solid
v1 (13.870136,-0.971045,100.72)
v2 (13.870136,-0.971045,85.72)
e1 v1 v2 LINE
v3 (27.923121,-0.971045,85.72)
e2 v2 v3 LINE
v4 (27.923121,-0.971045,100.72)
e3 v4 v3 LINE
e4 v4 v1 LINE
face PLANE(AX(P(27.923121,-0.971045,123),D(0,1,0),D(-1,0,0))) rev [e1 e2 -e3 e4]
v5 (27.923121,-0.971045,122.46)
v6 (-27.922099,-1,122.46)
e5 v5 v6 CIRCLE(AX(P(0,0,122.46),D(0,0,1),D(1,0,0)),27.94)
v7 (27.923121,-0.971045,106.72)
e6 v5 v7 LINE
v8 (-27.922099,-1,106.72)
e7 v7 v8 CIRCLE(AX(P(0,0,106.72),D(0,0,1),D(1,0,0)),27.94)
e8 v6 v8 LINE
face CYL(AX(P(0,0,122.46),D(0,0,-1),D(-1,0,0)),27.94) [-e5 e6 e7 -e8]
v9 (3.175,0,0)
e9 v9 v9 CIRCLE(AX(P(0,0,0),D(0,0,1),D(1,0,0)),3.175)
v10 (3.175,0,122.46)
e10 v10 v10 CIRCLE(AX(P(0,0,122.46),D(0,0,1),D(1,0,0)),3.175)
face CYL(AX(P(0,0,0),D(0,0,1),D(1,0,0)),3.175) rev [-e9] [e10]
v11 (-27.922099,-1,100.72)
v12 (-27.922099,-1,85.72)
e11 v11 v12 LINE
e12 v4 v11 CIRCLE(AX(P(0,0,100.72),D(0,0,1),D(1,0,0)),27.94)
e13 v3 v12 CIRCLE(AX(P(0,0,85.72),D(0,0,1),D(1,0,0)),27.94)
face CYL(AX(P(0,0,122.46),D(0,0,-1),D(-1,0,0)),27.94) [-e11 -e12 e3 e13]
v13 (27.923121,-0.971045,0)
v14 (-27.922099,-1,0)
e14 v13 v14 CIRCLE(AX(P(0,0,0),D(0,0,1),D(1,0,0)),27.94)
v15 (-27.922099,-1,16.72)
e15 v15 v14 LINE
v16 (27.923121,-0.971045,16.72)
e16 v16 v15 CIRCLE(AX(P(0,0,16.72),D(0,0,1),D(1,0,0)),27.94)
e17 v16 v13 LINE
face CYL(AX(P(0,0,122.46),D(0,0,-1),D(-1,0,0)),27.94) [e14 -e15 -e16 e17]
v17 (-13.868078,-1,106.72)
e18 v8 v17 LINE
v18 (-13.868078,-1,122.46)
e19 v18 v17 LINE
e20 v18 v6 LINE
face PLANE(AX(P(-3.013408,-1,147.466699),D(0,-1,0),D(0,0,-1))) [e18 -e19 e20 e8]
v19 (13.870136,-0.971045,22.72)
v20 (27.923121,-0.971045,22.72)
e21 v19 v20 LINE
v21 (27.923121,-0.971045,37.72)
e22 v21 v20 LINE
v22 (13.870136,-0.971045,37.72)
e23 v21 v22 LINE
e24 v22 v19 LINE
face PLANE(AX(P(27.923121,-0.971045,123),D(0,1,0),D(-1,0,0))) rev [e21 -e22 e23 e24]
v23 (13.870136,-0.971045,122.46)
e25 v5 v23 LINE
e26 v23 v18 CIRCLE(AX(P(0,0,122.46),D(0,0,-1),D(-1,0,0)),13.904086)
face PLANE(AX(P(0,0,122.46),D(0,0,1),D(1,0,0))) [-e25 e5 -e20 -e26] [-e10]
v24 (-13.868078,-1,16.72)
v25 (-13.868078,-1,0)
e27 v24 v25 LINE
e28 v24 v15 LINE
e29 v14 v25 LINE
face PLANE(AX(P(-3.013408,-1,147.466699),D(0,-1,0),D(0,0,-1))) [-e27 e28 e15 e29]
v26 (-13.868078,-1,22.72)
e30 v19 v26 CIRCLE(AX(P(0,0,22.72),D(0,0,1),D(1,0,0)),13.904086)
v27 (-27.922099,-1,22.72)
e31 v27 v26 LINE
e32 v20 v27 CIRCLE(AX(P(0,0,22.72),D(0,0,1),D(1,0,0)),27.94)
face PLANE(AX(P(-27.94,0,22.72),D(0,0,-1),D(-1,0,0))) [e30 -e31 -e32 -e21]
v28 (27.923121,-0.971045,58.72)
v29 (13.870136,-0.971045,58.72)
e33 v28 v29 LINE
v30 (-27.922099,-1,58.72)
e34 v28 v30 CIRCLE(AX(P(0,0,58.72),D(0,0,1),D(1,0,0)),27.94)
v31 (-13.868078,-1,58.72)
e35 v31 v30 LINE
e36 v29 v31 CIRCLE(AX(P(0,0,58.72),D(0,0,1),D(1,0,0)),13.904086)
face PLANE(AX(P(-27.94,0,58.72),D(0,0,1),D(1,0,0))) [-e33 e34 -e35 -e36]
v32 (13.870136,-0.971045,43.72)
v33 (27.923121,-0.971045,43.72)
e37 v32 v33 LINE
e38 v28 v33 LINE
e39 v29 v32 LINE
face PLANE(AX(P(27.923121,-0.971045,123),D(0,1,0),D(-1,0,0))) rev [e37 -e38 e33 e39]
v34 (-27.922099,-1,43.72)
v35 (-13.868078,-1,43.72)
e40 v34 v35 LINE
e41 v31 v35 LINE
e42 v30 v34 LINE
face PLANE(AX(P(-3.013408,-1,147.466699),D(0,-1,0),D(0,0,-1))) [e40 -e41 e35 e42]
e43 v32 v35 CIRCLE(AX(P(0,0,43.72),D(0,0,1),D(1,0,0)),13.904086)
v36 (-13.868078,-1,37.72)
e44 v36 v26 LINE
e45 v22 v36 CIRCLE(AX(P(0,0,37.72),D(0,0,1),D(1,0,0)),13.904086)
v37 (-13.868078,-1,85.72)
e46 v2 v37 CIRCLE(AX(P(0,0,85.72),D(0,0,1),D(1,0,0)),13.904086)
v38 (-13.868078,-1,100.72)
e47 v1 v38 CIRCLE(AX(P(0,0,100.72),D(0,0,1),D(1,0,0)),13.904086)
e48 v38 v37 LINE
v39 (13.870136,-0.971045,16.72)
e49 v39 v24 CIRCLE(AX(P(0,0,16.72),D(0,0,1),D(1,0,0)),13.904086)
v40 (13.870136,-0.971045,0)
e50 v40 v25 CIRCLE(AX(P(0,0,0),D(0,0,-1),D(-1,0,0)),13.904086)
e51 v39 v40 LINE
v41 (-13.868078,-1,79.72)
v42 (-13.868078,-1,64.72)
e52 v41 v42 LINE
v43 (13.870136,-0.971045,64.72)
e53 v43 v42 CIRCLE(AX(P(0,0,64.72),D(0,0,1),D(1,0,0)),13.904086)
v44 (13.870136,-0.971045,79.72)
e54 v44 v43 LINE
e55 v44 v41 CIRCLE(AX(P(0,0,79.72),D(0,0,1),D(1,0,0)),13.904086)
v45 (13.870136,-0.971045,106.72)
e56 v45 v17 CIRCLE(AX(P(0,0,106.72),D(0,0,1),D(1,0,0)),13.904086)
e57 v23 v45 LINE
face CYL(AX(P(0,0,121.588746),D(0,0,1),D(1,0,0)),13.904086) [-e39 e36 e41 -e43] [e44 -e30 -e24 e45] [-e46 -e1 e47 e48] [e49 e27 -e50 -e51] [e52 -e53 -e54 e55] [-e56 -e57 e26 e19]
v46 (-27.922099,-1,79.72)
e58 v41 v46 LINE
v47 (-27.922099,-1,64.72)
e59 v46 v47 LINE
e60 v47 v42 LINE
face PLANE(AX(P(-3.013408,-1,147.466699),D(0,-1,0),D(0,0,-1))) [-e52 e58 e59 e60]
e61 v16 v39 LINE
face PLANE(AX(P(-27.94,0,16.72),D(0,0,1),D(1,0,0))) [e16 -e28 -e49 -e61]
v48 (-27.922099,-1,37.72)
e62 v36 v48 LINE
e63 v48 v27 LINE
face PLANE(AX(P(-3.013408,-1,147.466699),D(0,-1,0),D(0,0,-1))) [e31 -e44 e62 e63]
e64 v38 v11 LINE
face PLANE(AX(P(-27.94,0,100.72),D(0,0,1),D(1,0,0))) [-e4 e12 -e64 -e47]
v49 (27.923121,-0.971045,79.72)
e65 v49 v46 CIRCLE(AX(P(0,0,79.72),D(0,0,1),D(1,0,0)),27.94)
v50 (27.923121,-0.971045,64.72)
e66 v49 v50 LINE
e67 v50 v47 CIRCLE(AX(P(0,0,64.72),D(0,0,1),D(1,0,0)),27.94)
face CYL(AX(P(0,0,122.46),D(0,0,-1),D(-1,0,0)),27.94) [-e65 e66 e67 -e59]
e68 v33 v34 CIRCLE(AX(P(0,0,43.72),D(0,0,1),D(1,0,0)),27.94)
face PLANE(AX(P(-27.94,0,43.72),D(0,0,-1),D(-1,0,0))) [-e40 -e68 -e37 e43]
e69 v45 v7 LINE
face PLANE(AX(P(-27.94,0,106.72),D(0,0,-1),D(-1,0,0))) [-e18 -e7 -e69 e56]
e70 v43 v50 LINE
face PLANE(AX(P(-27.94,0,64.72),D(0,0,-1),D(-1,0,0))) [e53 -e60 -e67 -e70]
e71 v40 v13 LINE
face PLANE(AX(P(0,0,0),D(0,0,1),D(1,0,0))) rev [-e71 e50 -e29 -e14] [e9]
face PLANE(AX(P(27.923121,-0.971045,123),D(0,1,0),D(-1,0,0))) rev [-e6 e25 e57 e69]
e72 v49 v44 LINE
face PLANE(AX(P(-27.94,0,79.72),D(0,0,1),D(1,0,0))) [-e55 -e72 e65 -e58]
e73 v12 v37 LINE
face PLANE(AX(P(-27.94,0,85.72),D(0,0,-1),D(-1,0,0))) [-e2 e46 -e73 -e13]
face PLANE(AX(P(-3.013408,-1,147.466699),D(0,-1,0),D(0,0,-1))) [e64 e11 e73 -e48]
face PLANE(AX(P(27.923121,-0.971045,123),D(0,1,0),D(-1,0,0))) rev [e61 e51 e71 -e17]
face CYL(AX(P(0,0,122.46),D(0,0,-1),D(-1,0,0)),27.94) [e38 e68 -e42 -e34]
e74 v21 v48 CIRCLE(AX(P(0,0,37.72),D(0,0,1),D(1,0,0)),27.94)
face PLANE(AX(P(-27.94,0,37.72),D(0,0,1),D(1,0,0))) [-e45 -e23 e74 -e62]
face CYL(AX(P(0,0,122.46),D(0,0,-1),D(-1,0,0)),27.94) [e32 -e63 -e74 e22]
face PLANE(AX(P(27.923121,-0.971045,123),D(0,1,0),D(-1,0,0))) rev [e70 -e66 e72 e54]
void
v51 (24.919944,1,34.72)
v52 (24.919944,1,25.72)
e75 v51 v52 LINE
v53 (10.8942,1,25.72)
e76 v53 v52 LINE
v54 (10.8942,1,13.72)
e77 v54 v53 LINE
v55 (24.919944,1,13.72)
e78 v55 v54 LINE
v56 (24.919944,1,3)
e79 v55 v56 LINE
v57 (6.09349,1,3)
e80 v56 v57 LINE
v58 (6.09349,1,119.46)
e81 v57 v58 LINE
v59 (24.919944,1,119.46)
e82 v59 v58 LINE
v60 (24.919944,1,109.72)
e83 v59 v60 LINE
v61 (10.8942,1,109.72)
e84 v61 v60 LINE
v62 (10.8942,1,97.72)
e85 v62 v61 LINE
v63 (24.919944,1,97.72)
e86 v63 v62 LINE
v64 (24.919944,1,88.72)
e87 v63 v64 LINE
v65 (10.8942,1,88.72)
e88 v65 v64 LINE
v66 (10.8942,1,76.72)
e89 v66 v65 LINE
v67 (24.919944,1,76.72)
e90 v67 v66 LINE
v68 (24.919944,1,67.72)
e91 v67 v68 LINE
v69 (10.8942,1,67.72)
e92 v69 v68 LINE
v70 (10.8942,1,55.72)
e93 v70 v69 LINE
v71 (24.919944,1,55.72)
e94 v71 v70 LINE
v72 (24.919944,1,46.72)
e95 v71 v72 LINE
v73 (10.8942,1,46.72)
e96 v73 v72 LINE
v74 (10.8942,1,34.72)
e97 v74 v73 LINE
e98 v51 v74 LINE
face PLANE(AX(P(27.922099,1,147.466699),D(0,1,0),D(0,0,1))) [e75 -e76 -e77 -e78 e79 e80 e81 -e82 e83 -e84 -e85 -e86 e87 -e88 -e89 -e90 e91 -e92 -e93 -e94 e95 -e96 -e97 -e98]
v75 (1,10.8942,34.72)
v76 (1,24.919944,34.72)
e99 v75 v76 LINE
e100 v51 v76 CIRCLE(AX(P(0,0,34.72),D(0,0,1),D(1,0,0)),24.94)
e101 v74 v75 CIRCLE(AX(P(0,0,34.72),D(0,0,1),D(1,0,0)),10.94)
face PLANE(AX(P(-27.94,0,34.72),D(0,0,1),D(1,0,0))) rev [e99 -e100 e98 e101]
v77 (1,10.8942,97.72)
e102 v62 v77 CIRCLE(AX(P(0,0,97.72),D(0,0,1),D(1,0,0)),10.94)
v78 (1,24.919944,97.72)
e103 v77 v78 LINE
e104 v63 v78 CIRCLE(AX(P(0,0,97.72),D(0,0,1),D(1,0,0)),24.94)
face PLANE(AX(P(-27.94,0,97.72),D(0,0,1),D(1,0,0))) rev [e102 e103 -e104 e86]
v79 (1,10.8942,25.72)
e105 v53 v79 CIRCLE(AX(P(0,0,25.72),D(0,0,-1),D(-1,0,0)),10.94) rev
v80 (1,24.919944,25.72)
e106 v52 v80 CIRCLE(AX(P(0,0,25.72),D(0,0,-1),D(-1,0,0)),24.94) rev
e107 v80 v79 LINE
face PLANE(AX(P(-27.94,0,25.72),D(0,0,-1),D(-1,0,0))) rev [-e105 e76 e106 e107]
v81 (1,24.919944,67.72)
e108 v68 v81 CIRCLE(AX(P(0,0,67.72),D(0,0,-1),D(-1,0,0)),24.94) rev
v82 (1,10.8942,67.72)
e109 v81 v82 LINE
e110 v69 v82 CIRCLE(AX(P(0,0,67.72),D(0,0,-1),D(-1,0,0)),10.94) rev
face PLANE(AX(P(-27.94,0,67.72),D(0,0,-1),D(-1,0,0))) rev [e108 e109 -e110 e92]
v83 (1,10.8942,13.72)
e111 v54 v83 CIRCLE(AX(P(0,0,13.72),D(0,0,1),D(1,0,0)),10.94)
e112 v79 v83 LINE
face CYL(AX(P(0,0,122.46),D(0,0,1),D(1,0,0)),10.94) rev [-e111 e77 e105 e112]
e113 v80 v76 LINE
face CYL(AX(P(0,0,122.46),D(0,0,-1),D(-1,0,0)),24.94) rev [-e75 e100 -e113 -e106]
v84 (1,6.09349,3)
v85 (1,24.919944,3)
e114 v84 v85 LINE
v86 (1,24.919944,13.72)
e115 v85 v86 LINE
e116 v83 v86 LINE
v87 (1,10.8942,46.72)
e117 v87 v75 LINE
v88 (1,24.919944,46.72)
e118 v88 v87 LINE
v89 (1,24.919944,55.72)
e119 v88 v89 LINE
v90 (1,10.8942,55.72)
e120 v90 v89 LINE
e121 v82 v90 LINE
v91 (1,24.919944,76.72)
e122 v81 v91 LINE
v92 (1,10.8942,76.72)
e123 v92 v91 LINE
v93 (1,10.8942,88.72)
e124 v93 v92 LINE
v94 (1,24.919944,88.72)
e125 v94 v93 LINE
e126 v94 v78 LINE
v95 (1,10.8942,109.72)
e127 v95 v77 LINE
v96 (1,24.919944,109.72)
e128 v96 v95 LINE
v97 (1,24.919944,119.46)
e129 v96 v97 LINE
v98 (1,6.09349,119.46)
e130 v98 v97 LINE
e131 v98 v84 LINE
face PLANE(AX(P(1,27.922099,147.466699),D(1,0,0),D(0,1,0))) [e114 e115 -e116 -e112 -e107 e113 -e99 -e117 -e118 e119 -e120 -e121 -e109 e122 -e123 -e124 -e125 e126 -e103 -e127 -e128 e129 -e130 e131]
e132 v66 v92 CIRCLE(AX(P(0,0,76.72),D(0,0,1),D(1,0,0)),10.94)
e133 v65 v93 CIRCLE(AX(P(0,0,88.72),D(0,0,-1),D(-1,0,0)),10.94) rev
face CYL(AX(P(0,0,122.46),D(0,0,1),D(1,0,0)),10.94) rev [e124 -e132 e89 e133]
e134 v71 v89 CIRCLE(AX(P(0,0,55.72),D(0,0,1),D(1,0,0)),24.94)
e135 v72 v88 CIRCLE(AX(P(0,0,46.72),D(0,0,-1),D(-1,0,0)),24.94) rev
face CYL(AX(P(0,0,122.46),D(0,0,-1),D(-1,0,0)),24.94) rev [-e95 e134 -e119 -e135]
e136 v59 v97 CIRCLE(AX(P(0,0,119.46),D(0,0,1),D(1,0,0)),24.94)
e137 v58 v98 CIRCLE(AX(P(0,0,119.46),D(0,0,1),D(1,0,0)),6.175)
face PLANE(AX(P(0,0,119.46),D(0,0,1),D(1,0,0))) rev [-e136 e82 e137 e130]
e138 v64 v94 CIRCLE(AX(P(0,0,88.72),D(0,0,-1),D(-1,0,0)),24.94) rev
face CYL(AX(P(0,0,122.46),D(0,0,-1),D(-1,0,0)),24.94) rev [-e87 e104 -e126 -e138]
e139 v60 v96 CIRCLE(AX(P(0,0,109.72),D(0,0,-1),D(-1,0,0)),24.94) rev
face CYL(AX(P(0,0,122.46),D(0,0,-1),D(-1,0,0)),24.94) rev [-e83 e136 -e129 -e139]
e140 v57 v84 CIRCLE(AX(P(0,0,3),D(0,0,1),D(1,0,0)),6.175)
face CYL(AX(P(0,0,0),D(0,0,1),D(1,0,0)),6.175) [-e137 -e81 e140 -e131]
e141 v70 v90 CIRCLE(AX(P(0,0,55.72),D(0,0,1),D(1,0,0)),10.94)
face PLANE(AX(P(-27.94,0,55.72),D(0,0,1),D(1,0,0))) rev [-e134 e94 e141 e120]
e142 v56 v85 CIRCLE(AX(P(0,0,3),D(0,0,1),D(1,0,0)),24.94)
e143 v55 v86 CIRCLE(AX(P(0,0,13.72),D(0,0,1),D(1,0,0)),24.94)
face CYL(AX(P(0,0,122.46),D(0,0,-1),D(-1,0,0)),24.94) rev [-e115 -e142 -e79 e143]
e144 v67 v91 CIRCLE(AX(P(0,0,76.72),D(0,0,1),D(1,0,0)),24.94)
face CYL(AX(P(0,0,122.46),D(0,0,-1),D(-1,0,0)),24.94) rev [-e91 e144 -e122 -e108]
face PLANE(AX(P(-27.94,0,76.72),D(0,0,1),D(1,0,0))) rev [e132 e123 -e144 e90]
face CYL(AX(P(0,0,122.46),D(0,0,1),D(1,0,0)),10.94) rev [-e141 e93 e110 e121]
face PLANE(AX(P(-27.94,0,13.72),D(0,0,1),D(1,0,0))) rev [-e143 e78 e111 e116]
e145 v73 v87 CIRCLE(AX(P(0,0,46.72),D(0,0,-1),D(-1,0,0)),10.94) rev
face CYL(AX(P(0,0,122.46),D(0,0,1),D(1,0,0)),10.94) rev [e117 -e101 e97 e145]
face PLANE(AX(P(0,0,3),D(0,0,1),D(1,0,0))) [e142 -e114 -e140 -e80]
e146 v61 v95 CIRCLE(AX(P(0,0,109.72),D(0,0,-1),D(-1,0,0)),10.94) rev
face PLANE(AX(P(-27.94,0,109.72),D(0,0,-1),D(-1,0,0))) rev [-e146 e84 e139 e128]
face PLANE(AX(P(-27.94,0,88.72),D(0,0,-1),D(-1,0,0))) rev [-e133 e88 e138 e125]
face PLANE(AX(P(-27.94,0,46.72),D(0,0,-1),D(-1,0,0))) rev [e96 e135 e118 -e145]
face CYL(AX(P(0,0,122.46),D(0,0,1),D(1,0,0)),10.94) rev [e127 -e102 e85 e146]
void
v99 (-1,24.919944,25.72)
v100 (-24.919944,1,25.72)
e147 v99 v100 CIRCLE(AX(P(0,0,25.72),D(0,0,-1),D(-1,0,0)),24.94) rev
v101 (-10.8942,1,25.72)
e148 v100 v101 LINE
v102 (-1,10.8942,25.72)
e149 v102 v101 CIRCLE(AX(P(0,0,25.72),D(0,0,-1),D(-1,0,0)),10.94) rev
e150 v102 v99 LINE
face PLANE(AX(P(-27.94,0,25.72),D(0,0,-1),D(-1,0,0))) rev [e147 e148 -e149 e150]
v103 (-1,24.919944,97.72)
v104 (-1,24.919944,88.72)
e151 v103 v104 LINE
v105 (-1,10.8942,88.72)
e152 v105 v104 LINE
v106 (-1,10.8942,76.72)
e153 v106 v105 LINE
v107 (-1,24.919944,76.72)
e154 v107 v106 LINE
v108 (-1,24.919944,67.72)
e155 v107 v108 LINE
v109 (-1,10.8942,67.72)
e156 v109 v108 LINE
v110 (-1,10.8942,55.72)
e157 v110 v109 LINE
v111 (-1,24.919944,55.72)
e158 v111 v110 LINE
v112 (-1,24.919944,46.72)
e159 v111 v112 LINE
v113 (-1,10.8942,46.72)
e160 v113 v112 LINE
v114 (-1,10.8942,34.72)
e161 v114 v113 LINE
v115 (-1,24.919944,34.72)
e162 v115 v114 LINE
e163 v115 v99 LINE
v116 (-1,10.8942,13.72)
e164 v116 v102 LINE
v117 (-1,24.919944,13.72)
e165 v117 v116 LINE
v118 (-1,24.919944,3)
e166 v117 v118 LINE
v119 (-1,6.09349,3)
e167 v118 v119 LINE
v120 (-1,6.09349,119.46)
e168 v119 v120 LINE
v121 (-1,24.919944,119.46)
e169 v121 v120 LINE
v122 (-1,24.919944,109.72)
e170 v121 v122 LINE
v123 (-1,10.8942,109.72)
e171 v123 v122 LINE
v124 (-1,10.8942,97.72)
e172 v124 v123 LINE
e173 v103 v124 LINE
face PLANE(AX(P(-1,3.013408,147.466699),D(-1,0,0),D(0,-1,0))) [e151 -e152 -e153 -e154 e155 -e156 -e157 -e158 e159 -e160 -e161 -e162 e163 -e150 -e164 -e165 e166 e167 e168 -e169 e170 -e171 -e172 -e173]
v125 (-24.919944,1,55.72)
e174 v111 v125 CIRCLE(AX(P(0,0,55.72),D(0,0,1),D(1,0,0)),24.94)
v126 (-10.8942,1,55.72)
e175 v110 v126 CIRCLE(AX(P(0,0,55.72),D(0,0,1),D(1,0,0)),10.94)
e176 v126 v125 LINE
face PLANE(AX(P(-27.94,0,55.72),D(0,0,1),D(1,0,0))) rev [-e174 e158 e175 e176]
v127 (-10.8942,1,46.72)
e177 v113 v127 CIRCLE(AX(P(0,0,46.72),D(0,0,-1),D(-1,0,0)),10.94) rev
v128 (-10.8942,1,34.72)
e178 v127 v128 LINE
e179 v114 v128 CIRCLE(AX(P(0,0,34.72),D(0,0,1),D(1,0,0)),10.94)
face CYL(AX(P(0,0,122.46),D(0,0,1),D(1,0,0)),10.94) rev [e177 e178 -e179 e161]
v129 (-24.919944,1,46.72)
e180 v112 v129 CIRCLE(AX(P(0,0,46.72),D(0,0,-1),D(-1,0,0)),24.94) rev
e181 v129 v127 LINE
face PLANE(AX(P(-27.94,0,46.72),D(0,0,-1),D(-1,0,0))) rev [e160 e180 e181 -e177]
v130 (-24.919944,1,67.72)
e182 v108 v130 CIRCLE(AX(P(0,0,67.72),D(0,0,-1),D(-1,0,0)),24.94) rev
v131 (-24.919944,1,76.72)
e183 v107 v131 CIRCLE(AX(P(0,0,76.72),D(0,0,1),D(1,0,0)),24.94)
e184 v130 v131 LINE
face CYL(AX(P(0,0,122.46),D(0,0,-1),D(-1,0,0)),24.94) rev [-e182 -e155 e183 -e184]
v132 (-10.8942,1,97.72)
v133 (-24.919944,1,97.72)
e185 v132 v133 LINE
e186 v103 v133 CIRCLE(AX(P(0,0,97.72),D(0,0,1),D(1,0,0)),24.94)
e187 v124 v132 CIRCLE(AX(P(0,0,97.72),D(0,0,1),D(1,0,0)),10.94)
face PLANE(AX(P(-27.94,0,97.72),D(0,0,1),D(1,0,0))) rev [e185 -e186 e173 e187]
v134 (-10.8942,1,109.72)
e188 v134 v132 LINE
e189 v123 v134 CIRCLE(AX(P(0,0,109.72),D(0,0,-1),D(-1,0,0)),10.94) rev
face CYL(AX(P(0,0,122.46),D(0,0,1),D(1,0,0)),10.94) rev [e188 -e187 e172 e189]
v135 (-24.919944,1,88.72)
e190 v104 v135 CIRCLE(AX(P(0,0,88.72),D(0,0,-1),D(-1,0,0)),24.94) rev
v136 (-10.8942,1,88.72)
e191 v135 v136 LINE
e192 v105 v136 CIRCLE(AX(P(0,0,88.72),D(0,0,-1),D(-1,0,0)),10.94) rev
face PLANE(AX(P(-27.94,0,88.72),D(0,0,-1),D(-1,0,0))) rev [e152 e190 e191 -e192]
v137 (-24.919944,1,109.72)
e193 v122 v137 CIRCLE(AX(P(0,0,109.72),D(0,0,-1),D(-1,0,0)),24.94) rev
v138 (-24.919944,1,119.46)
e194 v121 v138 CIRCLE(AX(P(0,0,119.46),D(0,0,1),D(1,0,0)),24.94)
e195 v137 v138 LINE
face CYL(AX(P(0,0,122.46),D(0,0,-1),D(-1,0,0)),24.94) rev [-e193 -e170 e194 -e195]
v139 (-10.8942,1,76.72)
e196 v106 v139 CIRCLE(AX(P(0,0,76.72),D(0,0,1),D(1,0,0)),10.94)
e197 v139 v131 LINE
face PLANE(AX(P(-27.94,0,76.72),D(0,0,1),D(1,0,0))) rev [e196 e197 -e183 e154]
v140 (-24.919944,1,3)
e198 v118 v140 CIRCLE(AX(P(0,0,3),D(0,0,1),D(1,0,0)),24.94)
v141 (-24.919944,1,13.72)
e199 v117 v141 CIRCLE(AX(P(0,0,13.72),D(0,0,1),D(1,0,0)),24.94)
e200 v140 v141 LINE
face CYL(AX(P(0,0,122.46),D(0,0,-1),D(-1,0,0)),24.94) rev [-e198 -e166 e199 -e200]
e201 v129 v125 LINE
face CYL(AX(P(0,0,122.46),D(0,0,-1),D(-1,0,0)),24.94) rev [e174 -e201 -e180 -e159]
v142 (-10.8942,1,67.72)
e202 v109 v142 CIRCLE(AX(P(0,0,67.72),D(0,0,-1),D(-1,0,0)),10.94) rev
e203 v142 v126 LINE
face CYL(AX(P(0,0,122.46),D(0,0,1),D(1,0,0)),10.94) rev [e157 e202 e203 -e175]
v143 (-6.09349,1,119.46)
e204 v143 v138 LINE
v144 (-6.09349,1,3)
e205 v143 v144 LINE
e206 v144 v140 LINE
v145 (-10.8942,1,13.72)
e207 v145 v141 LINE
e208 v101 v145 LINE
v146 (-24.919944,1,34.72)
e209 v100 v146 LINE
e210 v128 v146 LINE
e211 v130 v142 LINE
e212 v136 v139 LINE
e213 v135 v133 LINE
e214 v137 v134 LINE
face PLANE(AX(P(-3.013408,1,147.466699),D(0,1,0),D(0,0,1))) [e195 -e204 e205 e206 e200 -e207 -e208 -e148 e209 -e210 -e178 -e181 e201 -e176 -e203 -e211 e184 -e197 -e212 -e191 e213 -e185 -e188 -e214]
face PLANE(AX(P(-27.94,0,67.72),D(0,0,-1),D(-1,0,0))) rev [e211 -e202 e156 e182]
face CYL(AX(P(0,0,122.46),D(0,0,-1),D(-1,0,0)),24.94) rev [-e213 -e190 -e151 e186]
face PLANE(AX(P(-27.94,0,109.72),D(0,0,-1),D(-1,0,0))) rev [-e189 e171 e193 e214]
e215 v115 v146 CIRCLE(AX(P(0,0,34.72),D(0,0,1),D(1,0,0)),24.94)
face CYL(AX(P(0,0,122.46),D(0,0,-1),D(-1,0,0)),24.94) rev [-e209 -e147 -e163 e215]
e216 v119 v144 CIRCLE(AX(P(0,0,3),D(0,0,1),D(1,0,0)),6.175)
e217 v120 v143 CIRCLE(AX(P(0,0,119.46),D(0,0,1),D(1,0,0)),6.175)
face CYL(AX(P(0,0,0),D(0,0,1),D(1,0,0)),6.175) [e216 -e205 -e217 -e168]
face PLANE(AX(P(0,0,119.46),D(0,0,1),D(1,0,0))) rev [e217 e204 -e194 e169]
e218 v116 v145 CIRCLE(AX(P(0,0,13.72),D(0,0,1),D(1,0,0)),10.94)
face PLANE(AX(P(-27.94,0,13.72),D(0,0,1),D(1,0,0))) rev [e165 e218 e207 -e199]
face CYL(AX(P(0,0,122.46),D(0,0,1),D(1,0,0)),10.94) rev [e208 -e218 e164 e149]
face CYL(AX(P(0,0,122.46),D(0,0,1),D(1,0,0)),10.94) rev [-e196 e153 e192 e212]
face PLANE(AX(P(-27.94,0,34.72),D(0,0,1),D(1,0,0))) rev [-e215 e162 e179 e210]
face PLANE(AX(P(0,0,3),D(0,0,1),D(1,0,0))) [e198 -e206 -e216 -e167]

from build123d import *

# Parameters (mm, degrees)
SKETCH3_R            = 27.94
BOSS_EXTRUDE2_DEPTH  = 122.46
SKETCH5_R            = 3.175
CUT_EXTRUDE1_DEPTH   = 129.676877488
SKETCH4_W            = 14
SKETCH4_H            = 6
SHELL1_START         = 3
SHELL1_OUTLINE_R     = 10.94
SHELL1_OUTLINE_R_2   = 6.175
SHELL1_DEPTH         = 116.46
SHELL1_2_OUTLINE_R   = 24.94
SHELL1_2_OUTLINE_R_2 = 10.94
SHELL1_2_DEPTH       = 10.72
SHELL1_START_2       = 109.72
SHELL1_3_OUTLINE_R   = 24.94
SHELL1_3_OUTLINE_R_2 = 10.94
SHELL1_3_DEPTH       = 9.74
SHELL1_START_3       = 25.72
SHELL1_4_OUTLINE_R   = 24.94
SHELL1_4_OUTLINE_R_2 = 10.94
SHELL1_4_DEPTH       = 9
SHELL1_START_4       = 46.72
SHELL1_5_OUTLINE_R   = 24.94
SHELL1_5_OUTLINE_R_2 = 10.94
SHELL1_5_DEPTH       = 9
SHELL1_START_5       = 67.72
SHELL1_6_OUTLINE_R   = 24.94
SHELL1_6_OUTLINE_R_2 = 10.94
SHELL1_6_DEPTH       = 9
SHELL1_START_6       = 88.72
SHELL1_7_OUTLINE_R   = 24.94
SHELL1_7_OUTLINE_R_2 = 10.94
SHELL1_7_DEPTH       = 9
BOSS_EXTRUDE3_REACH  = 130.677
SKETCH13_W           = 16.483162312
SKETCH13_H           = 6
CUT_EXTRUDE3_DEPTH   = 123
BOSS_EXTRUDE5_START  = -122.46
BOSS_EXTRUDE5_DEPTH  = 122.46


# Read off the part's stored shape, not the designer's step: Shell1
with BuildPart() as part:
    # Sketch3 → Boss-Extrude2 (new body)
    with BuildSketch(Plane.XY):
        Circle(SKETCH3_R)
    extrude(amount=BOSS_EXTRUDE2_DEPTH)

    # Sketch5 → Cut-Extrude1 (cut, through all)
    with BuildSketch(Plane.XY.offset(122.46)):
        Circle(SKETCH5_R)
    extrude(amount=-CUT_EXTRUDE1_DEPTH, mode=Mode.SUBTRACT)

    # Sketch4 → Cut-Revolve1 (revolve, cut)
    with BuildSketch(Plane(origin=(0, 0, 0), x_dir=(1, 0, 0), z_dir=(0, 1, 0)), mode=Mode.PRIVATE) as cut_revolve1_sk:
        with Locations((-20.94, -103.72)):
            Rectangle(SKETCH4_W, SKETCH4_H)
        with Locations((-20.94, -82.72)):
            Rectangle(SKETCH4_W, SKETCH4_H)
        with Locations((-20.94, -61.72)):
            Rectangle(SKETCH4_W, SKETCH4_H)
        with Locations((-20.94, -40.72)):
            Rectangle(SKETCH4_W, SKETCH4_H)
        with Locations((-20.94, -19.72)):
            Rectangle(SKETCH4_W, SKETCH4_H)
    revolve(cut_revolve1_sk.sketch.rotate(Axis((0, 0, 122.46), (0, 0, -1)), 180), axis=Axis((0, 0, 122.46), (0, 0, -1)), mode=Mode.SUBTRACT)

    # Shell1 outline → Shell1 (cut)
    with BuildSketch(Plane.XY.offset(SHELL1_START)):
        Circle(SHELL1_OUTLINE_R)
        Circle(SHELL1_OUTLINE_R_2, mode=Mode.SUBTRACT)
    extrude(amount=SHELL1_DEPTH, mode=Mode.SUBTRACT)

    # Shell1 2 outline → Shell1 2 (cut)
    with BuildSketch(Plane.XY.offset(SHELL1_START)):
        Circle(SHELL1_2_OUTLINE_R)
        Circle(SHELL1_2_OUTLINE_R_2, mode=Mode.SUBTRACT)
    extrude(amount=SHELL1_2_DEPTH, mode=Mode.SUBTRACT)

    # Shell1 3 outline → Shell1 3 (cut)
    with BuildSketch(Plane.XY.offset(SHELL1_START_2)):
        Circle(SHELL1_3_OUTLINE_R)
        Circle(SHELL1_3_OUTLINE_R_2, mode=Mode.SUBTRACT)
    extrude(amount=SHELL1_3_DEPTH, mode=Mode.SUBTRACT)

    # Shell1 4 outline → Shell1 4 (cut)
    with BuildSketch(Plane.XY.offset(SHELL1_START_3)):
        Circle(SHELL1_4_OUTLINE_R)
        Circle(SHELL1_4_OUTLINE_R_2, mode=Mode.SUBTRACT)
    extrude(amount=SHELL1_4_DEPTH, mode=Mode.SUBTRACT)

    # Shell1 5 outline → Shell1 5 (cut)
    with BuildSketch(Plane.XY.offset(SHELL1_START_4)):
        Circle(SHELL1_5_OUTLINE_R)
        Circle(SHELL1_5_OUTLINE_R_2, mode=Mode.SUBTRACT)
    extrude(amount=SHELL1_5_DEPTH, mode=Mode.SUBTRACT)

    # Shell1 6 outline → Shell1 6 (cut)
    with BuildSketch(Plane.XY.offset(SHELL1_START_5)):
        Circle(SHELL1_6_OUTLINE_R)
        Circle(SHELL1_6_OUTLINE_R_2, mode=Mode.SUBTRACT)
    extrude(amount=SHELL1_6_DEPTH, mode=Mode.SUBTRACT)

    # Shell1 7 outline → Shell1 7 (cut)
    with BuildSketch(Plane.XY.offset(SHELL1_START_6)):
        Circle(SHELL1_7_OUTLINE_R)
        Circle(SHELL1_7_OUTLINE_R_2, mode=Mode.SUBTRACT)
    extrude(amount=SHELL1_7_DEPTH, mode=Mode.SUBTRACT)

    # Boss-Extrude3: up to this face of the body (flat: up to its plane)
    boss_extrude3_end = Plane(part.part.faces().sort_by_distance((-27.149737461, 0, 122.46))[0])
    # Sketch10 → Boss-Extrude3 (add, up to the picked face)
    with BuildSketch(Plane(origin=(0, 0, 0), x_dir=(-1, 0, 0), z_dir=(0, 0, -1)), mode=Mode.PRIVATE) as boss_extrude3_sk1:
        with BuildLine():
            Line((-1, 27.922098775), (-1, 3.01340754))
            ThreePointArc((-1, 3.01340754), (0, 3.175), (1, 3.01340754))
            Line((1, 3.01340754), (1, 27.922098775))
            ThreePointArc((1, 27.922098775), (0, 27.94), (-1, 27.922098775))
        make_face()
    boss_extrude3_tool1 = split(extrude(boss_extrude3_sk1.sketch, amount=-BOSS_EXTRUDE3_REACH, mode=Mode.PRIVATE), bisect_by=boss_extrude3_end, keep=Keep.BOTH, mode=Mode.PRIVATE)
    # Sketch10 → Boss-Extrude3 (add, up to the picked face)
    with BuildSketch(Plane(origin=(0, 0, 0), x_dir=(-1, 0, 0), z_dir=(0, 0, -1)), mode=Mode.PRIVATE) as boss_extrude3_sk2:
        with BuildLine():
            Line((3.01340754, 1), (27.922098775, 1))
            ThreePointArc((27.922098775, 1), (27.94, 0), (27.922098775, -1))
            Line((27.922098775, -1), (3.01340754, -1))
            ThreePointArc((3.01340754, -1), (3.175, 0), (3.01340754, 1))
        make_face()
    boss_extrude3_tool2 = split(extrude(boss_extrude3_sk2.sketch, amount=-BOSS_EXTRUDE3_REACH, mode=Mode.PRIVATE), bisect_by=boss_extrude3_end, keep=Keep.BOTH, mode=Mode.PRIVATE)
    # Sketch10 → Boss-Extrude3 (add, up to the picked face)
    with BuildSketch(Plane(origin=(0, 0, 0), x_dir=(-1, 0, 0), z_dir=(0, 0, -1)), mode=Mode.PRIVATE) as boss_extrude3_sk3:
        with BuildLine():
            Line((-1, -3.01340754), (-1, -27.922098775))
            ThreePointArc((-1, -27.922098775), (0, -27.94), (1, -27.922098775))
            Line((1, -27.922098775), (1, -3.01340754))
            ThreePointArc((1, -3.01340754), (0, -3.175), (-1, -3.01340754))
        make_face()
    boss_extrude3_tool3 = split(extrude(boss_extrude3_sk3.sketch, amount=-BOSS_EXTRUDE3_REACH, mode=Mode.PRIVATE), bisect_by=boss_extrude3_end, keep=Keep.BOTH, mode=Mode.PRIVATE)
    # Sketch10 → Boss-Extrude3 (add, up to the picked face)
    with BuildSketch(Plane(origin=(0, 0, 0), x_dir=(-1, 0, 0), z_dir=(0, 0, -1)), mode=Mode.PRIVATE) as boss_extrude3_sk4:
        with BuildLine():
            Line((-27.922098775, -1), (-3.01340754, -1))
            ThreePointArc((-3.01340754, -1), (-3.175, 0), (-3.01340754, 1))
            Line((-3.01340754, 1), (-27.922098775, 1))
            ThreePointArc((-27.922098775, 1), (-27.94, 0), (-27.922098775, -1))
        make_face()
    boss_extrude3_tool4 = split(extrude(boss_extrude3_sk4.sketch, amount=-BOSS_EXTRUDE3_REACH, mode=Mode.PRIVATE), bisect_by=boss_extrude3_end, keep=Keep.BOTH, mode=Mode.PRIVATE)
    add(boss_extrude3_tool1.solids().sort_by(Axis((0, 15.527819, 0), (0, 0, 1)))[0])
    add(boss_extrude3_tool2.solids().sort_by(Axis((-15.527819, 0, 0), (0, 0, 1)))[0])
    add(boss_extrude3_tool3.solids().sort_by(Axis((0, -15.527819, 0), (0, 0, 1)))[0])
    add(boss_extrude3_tool4.solids().sort_by(Axis((15.527819, 0, 0), (0, 0, 1)))[0])

    # Sketch13 → Cut-Revolve2 (revolve, cut)
    with BuildSketch(Plane(origin=(0, 0, 0), x_dir=(1, 0, 0), z_dir=(0, 1, 0)), mode=Mode.PRIVATE) as cut_revolve2_sk:
        with Locations((-22.145666886, -40.72)):
            Rectangle(SKETCH13_W, SKETCH13_H)
        with Locations((-22.145666886, -19.72)):
            Rectangle(SKETCH13_W, SKETCH13_H)
        with Locations((-22.145666886, -61.72)):
            Rectangle(SKETCH13_W, SKETCH13_H)
        with Locations((-22.145666886, -82.72)):
            Rectangle(SKETCH13_W, SKETCH13_H)
        with Locations((-22.145666886, -103.72)):
            Rectangle(SKETCH13_W, SKETCH13_H)
    revolve(cut_revolve2_sk.sketch.rotate(Axis((0, 0, 121.588746248), (0, 0, -1)), 180), axis=Axis((0, 0, 121.588746248), (0, 0, -1)), mode=Mode.SUBTRACT)

    # Sketch16 → Cut-Extrude3 (cut)
    with BuildSketch(Plane(origin=(0, 0, 0), x_dir=(-1, 0, 0), z_dir=(0, 0, -1))):
        with BuildLine():
            Line((-27.923120749, -0.971044624), (-6.098171639, -0.971044624))
            ThreePointArc((-6.098171639, -0.971044624), (-0.014665674, -6.174982584), (6.093490379, -1))
            Line((6.093490379, -1), (27.922098775, -1))
            ThreePointArc((27.922098775, -1), (-0.014486703, -27.939996244), (-27.923120749, -0.971044624))
        make_face()
    extrude(amount=-CUT_EXTRUDE3_DEPTH, mode=Mode.SUBTRACT)

    # Sketch18 → Boss-Extrude5 (add)
    with BuildSketch(Plane(origin=(0, 0, 0), x_dir=(-1, 0, 0), z_dir=(0, 0, -1)).offset(BOSS_EXTRUDE5_START)):
        with BuildLine():
            Line((-3.175, 0), (-13.90408573, 0))
            ThreePointArc((-13.90408573, 0), (0, -13.90408573), (13.90408573, 0))
            Line((13.90408573, 0), (3.175, 0))
            ThreePointArc((3.175, 0), (0, -3.175), (-3.175, 0))
        make_face()
    extrude(amount=BOSS_EXTRUDE5_DEPTH)


solid = part.part
